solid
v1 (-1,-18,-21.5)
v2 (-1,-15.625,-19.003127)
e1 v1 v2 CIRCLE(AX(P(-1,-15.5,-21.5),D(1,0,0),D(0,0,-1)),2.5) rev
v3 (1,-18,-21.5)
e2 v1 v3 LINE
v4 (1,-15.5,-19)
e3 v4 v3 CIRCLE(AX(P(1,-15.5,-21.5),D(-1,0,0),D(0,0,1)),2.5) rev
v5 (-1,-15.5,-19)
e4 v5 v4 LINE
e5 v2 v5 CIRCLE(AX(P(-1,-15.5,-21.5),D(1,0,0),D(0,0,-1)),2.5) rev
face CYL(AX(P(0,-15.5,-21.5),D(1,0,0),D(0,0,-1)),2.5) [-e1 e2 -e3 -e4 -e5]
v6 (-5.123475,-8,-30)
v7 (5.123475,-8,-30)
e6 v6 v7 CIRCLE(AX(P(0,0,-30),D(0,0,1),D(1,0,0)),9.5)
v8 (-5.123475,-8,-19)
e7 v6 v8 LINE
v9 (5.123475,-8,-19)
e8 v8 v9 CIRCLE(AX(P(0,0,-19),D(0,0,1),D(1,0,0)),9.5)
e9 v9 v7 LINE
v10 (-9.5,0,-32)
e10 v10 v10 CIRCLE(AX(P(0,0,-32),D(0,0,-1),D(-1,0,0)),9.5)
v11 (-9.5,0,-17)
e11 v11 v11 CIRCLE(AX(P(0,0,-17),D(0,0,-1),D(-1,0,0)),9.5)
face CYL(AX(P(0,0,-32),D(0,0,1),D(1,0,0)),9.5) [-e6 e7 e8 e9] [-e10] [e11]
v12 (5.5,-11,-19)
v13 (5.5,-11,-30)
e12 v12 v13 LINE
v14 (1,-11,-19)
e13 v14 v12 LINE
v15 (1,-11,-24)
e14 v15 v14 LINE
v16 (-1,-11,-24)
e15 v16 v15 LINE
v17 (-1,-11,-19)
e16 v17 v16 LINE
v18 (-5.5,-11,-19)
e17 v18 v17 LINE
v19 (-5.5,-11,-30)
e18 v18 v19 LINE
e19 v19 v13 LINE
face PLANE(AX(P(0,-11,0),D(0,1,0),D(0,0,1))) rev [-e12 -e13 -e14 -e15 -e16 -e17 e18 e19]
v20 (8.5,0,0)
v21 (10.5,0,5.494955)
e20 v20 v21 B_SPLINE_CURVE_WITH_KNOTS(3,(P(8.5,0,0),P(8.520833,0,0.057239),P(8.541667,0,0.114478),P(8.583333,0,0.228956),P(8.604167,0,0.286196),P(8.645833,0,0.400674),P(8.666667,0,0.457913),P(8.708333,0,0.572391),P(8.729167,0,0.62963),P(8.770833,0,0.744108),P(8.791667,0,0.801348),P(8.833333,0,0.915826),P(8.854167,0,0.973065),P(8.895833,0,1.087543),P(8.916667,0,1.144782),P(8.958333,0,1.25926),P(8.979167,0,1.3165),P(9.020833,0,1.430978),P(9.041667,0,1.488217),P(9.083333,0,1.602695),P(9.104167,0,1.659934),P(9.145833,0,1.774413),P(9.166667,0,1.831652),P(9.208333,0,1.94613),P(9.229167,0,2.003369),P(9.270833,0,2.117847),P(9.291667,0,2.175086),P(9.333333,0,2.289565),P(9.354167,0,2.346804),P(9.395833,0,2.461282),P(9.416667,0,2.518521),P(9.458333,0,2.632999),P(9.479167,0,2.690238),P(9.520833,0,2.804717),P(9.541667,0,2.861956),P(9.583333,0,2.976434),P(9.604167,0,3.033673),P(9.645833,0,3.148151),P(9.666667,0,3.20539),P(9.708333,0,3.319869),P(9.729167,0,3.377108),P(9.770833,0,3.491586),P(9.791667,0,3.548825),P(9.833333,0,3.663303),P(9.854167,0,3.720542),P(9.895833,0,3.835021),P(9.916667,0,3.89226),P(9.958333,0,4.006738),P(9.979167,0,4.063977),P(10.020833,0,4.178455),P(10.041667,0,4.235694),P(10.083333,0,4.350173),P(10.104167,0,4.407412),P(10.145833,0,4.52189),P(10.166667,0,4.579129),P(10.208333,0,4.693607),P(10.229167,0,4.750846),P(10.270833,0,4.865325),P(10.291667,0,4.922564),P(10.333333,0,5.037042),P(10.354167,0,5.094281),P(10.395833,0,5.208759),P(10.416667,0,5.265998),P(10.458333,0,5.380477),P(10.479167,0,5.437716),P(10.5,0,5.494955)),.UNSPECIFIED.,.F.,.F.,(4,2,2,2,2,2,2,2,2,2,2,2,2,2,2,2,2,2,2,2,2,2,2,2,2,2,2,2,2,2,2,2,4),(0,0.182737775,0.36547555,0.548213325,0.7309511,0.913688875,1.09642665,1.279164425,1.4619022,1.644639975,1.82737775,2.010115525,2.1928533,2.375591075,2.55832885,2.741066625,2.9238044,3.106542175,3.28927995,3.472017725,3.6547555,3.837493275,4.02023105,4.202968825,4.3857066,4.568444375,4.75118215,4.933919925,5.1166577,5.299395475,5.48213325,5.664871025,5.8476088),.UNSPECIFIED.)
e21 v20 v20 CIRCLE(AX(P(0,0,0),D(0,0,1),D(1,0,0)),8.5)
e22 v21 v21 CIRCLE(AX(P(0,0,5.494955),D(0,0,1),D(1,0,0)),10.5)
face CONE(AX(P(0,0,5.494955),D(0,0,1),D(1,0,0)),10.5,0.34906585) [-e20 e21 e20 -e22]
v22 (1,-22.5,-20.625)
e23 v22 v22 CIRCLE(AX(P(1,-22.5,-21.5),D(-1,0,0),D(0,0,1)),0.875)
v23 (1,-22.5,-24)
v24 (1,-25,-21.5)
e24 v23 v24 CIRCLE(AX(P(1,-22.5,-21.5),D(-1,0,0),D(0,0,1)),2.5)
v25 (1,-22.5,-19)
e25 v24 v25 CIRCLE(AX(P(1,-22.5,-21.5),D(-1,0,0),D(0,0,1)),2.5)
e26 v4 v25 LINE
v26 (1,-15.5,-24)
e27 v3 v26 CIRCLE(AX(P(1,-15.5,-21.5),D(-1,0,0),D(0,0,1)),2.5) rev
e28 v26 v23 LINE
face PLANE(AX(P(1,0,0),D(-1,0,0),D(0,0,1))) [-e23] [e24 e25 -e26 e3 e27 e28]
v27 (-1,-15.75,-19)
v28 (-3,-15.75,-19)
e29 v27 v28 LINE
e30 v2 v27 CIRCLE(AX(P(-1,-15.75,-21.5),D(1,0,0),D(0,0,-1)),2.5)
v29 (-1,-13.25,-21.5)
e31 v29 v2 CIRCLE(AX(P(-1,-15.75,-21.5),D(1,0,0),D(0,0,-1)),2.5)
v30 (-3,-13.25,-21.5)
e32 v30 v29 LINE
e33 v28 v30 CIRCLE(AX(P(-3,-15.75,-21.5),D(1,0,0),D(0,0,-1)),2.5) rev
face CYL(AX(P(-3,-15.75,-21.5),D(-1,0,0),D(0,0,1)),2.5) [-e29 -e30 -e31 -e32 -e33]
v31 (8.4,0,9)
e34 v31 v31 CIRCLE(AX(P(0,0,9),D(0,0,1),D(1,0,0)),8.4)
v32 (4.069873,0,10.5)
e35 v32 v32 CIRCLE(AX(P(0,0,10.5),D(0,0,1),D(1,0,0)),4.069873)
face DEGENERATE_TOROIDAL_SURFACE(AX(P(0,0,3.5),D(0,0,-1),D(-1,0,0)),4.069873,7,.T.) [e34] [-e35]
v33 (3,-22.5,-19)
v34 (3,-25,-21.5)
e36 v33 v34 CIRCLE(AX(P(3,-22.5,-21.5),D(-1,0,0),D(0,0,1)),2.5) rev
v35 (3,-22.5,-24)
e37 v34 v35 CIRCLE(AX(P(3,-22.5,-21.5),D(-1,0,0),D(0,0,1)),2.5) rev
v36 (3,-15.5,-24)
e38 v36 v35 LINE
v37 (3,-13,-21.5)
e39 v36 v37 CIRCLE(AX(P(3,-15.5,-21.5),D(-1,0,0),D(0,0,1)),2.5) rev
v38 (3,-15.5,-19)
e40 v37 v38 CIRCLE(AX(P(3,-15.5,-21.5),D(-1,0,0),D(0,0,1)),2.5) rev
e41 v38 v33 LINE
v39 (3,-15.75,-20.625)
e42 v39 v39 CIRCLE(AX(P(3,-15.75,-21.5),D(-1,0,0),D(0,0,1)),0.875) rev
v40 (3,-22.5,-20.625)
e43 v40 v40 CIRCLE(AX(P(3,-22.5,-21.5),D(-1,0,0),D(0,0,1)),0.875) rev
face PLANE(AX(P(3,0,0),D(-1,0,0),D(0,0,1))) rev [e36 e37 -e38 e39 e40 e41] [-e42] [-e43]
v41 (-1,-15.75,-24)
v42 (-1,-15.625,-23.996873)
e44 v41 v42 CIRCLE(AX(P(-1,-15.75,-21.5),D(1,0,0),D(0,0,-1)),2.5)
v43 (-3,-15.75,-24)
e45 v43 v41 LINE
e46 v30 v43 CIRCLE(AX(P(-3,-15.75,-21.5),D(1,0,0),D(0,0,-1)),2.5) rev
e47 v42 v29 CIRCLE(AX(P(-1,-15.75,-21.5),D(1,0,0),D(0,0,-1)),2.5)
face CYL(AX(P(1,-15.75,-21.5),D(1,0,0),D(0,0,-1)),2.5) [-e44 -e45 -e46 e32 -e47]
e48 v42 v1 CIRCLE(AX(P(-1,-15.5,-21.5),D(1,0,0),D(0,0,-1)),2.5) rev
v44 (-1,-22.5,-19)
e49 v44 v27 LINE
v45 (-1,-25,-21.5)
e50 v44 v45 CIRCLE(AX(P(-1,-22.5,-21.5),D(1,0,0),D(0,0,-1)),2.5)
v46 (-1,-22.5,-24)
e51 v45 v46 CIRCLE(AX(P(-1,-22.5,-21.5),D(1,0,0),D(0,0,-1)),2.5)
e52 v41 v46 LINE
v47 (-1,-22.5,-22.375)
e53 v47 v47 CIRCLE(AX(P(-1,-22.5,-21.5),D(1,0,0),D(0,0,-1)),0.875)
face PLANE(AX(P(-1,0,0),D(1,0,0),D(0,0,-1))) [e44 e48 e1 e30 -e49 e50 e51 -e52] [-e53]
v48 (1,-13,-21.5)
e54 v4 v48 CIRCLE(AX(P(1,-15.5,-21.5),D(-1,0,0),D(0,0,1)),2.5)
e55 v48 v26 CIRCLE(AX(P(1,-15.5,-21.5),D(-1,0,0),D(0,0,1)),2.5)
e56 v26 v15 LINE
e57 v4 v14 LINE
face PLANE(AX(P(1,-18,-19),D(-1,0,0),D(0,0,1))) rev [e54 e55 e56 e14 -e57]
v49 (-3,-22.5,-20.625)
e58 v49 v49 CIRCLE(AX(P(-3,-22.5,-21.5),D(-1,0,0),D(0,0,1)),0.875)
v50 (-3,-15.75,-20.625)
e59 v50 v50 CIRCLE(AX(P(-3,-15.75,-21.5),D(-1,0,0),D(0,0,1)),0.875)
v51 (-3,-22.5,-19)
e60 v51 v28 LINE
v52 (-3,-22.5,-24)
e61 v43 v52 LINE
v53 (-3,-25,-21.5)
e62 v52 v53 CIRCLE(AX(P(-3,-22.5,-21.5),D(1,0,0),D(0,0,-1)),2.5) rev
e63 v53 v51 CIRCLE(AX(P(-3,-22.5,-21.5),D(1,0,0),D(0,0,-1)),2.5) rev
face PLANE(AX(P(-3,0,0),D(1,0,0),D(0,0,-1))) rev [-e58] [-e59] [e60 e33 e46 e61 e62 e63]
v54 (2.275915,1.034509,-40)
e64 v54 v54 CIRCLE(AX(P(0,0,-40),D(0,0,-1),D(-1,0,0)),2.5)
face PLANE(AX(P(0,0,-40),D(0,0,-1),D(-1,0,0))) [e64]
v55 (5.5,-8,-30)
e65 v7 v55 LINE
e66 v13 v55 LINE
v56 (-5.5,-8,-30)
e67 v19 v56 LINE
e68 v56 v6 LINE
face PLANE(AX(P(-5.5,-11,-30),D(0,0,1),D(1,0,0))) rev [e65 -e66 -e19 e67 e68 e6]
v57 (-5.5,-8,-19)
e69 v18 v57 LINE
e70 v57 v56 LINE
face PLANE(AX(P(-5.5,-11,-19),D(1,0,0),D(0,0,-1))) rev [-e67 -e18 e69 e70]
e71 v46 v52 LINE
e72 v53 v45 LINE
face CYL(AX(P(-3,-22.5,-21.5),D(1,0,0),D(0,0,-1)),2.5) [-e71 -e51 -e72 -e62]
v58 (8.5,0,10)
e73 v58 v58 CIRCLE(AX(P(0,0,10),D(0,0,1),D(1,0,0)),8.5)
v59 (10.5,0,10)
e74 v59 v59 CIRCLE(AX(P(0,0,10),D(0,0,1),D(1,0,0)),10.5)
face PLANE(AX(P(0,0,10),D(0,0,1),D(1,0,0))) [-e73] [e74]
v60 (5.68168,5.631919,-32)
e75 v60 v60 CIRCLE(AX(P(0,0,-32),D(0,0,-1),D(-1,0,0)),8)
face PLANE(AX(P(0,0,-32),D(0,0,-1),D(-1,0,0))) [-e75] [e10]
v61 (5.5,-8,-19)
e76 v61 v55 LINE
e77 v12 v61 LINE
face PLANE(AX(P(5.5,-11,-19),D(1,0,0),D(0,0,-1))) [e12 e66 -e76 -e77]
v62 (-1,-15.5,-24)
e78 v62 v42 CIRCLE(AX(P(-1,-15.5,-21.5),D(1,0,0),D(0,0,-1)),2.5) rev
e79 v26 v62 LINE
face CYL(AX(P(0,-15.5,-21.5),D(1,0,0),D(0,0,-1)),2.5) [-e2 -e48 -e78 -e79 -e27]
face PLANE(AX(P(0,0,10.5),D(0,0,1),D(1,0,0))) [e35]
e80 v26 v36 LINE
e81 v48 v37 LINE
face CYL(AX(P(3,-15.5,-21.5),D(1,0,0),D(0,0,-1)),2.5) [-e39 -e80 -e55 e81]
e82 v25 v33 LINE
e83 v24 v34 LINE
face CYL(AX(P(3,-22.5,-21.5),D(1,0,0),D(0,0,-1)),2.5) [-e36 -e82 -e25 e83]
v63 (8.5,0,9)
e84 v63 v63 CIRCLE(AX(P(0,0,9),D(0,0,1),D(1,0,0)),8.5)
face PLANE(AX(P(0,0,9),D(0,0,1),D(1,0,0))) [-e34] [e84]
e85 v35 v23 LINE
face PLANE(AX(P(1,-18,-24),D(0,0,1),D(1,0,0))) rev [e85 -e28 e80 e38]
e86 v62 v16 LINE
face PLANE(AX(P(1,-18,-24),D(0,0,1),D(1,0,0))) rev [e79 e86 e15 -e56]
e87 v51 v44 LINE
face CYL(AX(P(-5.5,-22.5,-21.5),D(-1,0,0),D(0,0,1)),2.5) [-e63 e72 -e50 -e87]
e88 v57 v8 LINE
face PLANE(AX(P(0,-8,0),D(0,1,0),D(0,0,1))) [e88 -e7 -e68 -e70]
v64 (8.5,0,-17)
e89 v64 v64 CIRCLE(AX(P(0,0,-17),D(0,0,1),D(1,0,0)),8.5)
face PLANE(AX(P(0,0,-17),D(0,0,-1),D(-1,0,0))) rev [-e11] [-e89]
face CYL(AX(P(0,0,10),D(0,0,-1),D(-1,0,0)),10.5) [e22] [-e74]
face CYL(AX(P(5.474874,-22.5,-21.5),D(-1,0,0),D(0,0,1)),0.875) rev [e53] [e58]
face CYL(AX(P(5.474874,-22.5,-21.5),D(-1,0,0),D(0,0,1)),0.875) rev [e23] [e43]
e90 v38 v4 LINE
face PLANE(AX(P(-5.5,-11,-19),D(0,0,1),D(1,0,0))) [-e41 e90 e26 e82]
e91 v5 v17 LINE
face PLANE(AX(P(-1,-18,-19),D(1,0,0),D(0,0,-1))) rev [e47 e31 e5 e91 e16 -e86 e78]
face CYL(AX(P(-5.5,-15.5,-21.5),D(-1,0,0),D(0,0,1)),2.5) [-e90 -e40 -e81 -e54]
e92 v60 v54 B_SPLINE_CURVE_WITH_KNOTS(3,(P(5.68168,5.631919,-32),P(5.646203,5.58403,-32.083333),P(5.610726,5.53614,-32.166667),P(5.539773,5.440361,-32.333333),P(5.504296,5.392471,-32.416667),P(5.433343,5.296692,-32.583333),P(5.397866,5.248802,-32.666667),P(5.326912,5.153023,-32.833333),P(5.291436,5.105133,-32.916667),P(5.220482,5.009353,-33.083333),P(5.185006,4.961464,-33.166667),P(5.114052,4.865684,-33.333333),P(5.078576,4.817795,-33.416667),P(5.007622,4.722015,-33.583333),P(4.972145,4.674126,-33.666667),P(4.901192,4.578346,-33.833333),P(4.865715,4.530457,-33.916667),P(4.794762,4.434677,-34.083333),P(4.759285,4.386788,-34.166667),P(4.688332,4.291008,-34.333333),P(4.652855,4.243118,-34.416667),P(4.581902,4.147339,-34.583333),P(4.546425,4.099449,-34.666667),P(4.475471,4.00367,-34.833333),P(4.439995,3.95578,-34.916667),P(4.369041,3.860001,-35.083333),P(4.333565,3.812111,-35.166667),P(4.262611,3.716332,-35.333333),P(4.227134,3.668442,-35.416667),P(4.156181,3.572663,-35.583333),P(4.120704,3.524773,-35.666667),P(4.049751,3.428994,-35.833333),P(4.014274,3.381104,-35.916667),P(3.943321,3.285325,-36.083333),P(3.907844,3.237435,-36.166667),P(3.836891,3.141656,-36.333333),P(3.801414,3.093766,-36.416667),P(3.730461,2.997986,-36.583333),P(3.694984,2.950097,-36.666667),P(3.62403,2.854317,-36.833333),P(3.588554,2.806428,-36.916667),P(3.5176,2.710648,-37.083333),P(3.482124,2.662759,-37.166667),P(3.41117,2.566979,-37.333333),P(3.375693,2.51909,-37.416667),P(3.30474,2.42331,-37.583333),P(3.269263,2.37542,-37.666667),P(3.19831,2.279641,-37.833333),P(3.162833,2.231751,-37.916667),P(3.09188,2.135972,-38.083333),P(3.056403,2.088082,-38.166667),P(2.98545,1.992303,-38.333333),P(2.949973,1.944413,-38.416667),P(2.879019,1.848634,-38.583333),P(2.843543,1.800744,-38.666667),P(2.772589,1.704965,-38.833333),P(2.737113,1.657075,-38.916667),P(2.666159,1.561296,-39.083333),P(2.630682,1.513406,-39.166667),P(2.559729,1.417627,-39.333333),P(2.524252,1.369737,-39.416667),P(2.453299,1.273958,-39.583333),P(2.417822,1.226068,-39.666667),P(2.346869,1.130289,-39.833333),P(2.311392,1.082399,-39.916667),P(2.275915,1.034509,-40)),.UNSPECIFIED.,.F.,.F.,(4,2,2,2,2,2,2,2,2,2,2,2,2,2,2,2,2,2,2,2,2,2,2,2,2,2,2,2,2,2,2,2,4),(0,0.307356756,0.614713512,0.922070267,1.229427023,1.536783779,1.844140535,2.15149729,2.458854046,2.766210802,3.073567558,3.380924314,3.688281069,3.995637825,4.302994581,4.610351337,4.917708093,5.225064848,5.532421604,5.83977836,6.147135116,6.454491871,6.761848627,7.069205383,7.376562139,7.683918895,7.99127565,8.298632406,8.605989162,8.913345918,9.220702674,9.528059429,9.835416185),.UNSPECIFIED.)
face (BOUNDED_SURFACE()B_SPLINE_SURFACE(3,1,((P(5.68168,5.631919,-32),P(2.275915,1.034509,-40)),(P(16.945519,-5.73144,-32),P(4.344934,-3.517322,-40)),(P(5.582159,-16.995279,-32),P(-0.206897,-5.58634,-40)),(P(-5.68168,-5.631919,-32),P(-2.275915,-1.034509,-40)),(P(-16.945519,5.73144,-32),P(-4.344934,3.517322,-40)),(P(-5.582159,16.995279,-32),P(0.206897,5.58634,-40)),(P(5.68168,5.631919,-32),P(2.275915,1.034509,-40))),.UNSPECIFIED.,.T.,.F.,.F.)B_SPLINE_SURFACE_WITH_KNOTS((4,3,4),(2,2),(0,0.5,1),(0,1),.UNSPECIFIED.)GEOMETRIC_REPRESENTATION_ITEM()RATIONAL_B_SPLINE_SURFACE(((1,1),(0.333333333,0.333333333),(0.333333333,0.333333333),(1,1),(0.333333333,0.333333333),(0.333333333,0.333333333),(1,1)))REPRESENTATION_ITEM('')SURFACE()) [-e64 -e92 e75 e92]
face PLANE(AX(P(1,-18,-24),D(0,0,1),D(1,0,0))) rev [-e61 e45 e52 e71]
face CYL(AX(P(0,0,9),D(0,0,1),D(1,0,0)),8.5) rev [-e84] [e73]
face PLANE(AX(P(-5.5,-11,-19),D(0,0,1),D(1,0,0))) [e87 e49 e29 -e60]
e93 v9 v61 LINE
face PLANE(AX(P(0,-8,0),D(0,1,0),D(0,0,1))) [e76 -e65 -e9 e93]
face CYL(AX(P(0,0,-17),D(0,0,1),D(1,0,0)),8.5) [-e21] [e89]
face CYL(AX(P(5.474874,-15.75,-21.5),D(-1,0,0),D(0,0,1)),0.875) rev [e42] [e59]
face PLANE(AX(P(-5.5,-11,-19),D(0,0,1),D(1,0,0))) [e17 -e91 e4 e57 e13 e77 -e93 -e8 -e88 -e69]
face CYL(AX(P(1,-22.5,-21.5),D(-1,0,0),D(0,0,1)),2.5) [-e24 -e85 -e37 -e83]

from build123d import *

# Parameters (mm, degrees)
SKETCH1_R            = 8.5
BOSS_EXTRUDE1_DEPTH  = 17
SKETCH2_R            = 10.5
BOSS_EXTRUDE2_DEPTH  = 10
CHAMFER1_SIZE        = 5.494954839
CHAMFER1_SIZE_2      = 2
SKETCH3_R            = 8.5
CUT_EXTRUDE1_DEPTH   = 1
SKETCH4_R            = 9.5
BOSS_EXTRUDE3_DEPTH  = 15
SKETCH9_W            = 11
SKETCH9_H            = 11
BOSS_EXTRUDE4_DEPTH  = 3
SKETCH10_W           = 2
SKETCH10_H           = 5
BOSS_EXTRUDE5_DEPTH  = 7
FILLET1_R            = 2.5
SKETCH13_R           = 8.4
BOSS_EXTRUDE7_DEPTH  = 1.5
FILLET3_R            = 7
SKETCH14_W           = 5
SKETCH14_H           = 12
BOSS_EXTRUDE9_DEPTH  = 2
SKETCH15_W           = 5
SKETCH15_H           = 11.75
BOSS_EXTRUDE10_DEPTH = 2
FILLET4_START        = -5.5
FILLET4_DEPTH        = 4.5
FILLET4_START_2      = 1
FILLET4_2_DEPTH      = 4.5
CUT_EXTRUDE3_REACH   = 51.064
SKETCH16_R           = 0.875


with BuildPart() as part:
    # Sketch1 → Boss-Extrude1 (new body)
    with BuildSketch(Plane.XY):
        Circle(SKETCH1_R)
    extrude(amount=-BOSS_EXTRUDE1_DEPTH)

    # Sketch2 → Boss-Extrude2 (add)
    with BuildSketch(Plane.XY):
        Circle(SKETCH2_R)
    extrude(amount=BOSS_EXTRUDE2_DEPTH)

    # Chamfer1
    # the kernel refuses this chamfer: 5.494954839, 2 mm, written as the material it takes off along each edge
    with BuildSketch(Plane(origin=(0, 0, 0), x_dir=(1, 0, 0), z_dir=(0, -1, 0))) as chamfer1_piece_1_section:
        Polygon((10.5, CHAMFER1_SIZE), (10.5 - CHAMFER1_SIZE_2, 0), (10.5, 0), align=None)
    chamfer1_piece_1 = revolve(axis=Axis((0, 0, 0), (0, 0, 1)), mode=Mode.PRIVATE)
    chamfer1_piece_1 = chamfer1_piece_1 - Plane(origin=(0, 0, 0), x_dir=(1, 0, 0), z_dir=(0, 0, 1)) * Cylinder(8.5, 42, mode=Mode.PRIVATE)
    add(chamfer1_piece_1, mode=Mode.SUBTRACT)

    # Sketch3 → Cut-Extrude1 (cut)
    with BuildSketch(Plane.XY.offset(10)):
        Circle(SKETCH3_R)
    extrude(amount=-CUT_EXTRUDE1_DEPTH, mode=Mode.SUBTRACT)

    # Sketch4 → Boss-Extrude3 (add)
    with BuildSketch(Plane(origin=(0, 0, -17), x_dir=(-1, 0, 0), z_dir=(0, 0, -1))):
        Circle(SKETCH4_R)
    extrude(amount=BOSS_EXTRUDE3_DEPTH)

    # Loft2: read off the stored shape, not the designer's step
    # Loft2: loft between two sections, ruled curve by curve
    loft2_from = [
        Edge.make_bspline([(5.6816796, 5.631919471, -32), (16.945518542, -5.731439728, -32), (5.582159343, -16.99527867, -32), (-5.6816796, -5.631919471, -32), (-16.945518542, 5.731439728, -32), (-5.582159343, 16.99527867, -32), (5.6816796, 5.631919471, -32)], [0, 0, 0, 0, 0.5, 0.5, 0.5, 1, 1, 1, 1], 3, [1, 0.333333333, 0.333333333, 1, 0.333333333, 0.333333333, 1]),
    ]
    loft2_to = [
        Edge.make_bspline([(2.275915377, 1.034509157, -40), (4.344933691, -3.517321597, -40), (-0.206897063, -5.586339911, -40), (-2.275915377, -1.034509157, -40), (-4.344933691, 3.517321597, -40), (0.206897063, 5.586339911, -40), (2.275915377, 1.034509157, -40)], [0, 0, 0, 0, 0.5, 0.5, 0.5, 1, 1, 1, 1], 3, [1, 0.333333333, 0.333333333, 1, 0.333333333, 0.333333333, 1]),
    ]
    loft2 = Solid(Shell([*[Face.make_surface_from_curves(loft2_from[k], loft2_to[k]) for k in range(1)], Face(Wire(loft2_from)), Face(Wire(loft2_to))]))
    add(loft2)

    # Sketch9 → Boss-Extrude4 (add)
    with BuildSketch(Plane(origin=(0, -8, 0), x_dir=(1, 0, 0), z_dir=(0, 1, 0))):
        with Locations((0, 24.5)):
            Rectangle(SKETCH9_W, SKETCH9_H)
    extrude(amount=-BOSS_EXTRUDE4_DEPTH)

    # Sketch10 → Boss-Extrude5 (add)
    with BuildSketch(Plane.XZ.offset(11)):
        with Locations((0, -21.5)):
            Rectangle(SKETCH10_W, SKETCH10_H)
    extrude(amount=BOSS_EXTRUDE5_DEPTH)

    # Fillet1
    fillet1_edges = [part.edges().sort_by_distance(p)[0] for p in [
        (0, -18, -19),
        (0, -18, -24),
    ]]
    fillet(fillet1_edges, radius=FILLET1_R - 0.0001)  # a hair under: the kernel refuses the full size

    # Sketch13 → Boss-Extrude7 (add)
    with BuildSketch(Plane.XY.offset(9)):
        Circle(SKETCH13_R)
    extrude(amount=BOSS_EXTRUDE7_DEPTH)

    # Fillet3
    # the kernel refuses this fillet: 7 mm, written as the material it takes off along each edge
    with BuildSketch(Plane(origin=(0, 0, 10.5), x_dir=(1, 0, 0), z_dir=(0, -1, 0))) as fillet3_piece_1:
        with BuildLine():
            CenterArc((4.069872981, -7), FILLET3_R, 51.786789298, 38.213210702)
            Line((4.069872981, 0), (8.4, 0))
            Line((8.4, 0), (8.4, -1.5))
        make_face()
    revolve(axis=Axis((0, 0, 10.5), (0, 0, 1)), mode=Mode.SUBTRACT)

    # Sketch14 → Boss-Extrude9 (add)
    with BuildSketch(Plane(origin=(1, 0, 0), x_dir=(0, 0, -1), z_dir=(1, 0, 0))):
        with Locations((21.5, -19)):
            Rectangle(SKETCH14_W, SKETCH14_H)
    extrude(amount=BOSS_EXTRUDE9_DEPTH)

    # Sketch15 → Boss-Extrude10 (add)
    with BuildSketch(Plane.ZY.offset(1)):
        with Locations((-21.5, -19.125)):
            Rectangle(SKETCH15_W, SKETCH15_H)
    extrude(amount=BOSS_EXTRUDE10_DEPTH)

    # Fillet4: read off the stored shape, not the designer's step
    # Fillet4 outline → Fillet4 (cut)
    with BuildSketch(Plane.YZ.offset(FILLET4_START)):
        with BuildLine():
            Line((-25, -19), (-25, -21.5))
            ThreePointArc((-25, -21.5), (-24.267766953, -19.732233047), (-22.5, -19))
            Line((-22.5, -19), (-25, -19))
        make_face()
        with BuildLine():
            ThreePointArc((-22.5, -24), (-24.267766953, -23.267766953), (-25, -21.5))
            Line((-25, -21.5), (-25, -24))
            Line((-25, -24), (-22.5, -24))
        make_face()
        with BuildLine():
            ThreePointArc((-13.25, -21.5), (-13.982233047, -23.267766953), (-15.75, -24))
            Line((-15.75, -24), (-13.25, -24))
            Line((-13.25, -24), (-13.25, -21.5))
        make_face()
        with BuildLine():
            ThreePointArc((-15.75, -19), (-13.982233047, -19.732233047), (-13.25, -21.5))
            Line((-13.25, -21.5), (-13.25, -19))
            Line((-13.25, -19), (-15.75, -19))
        make_face()
    extrude(amount=FILLET4_DEPTH, mode=Mode.SUBTRACT)

    # Fillet4 2 outline → Fillet4 2 (cut)
    with BuildSketch(Plane.YZ.offset(FILLET4_START_2)):
        with BuildLine():
            Line((-25, -19), (-25, -21.5))
            ThreePointArc((-25, -21.5), (-24.267766953, -19.732233047), (-22.5, -19))
            Line((-22.5, -19), (-25, -19))
        make_face()
        with BuildLine():
            ThreePointArc((-22.5, -24), (-24.267766953, -23.267766953), (-25, -21.5))
            Line((-25, -21.5), (-25, -24))
            Line((-25, -24), (-22.5, -24))
        make_face()
        with BuildLine():
            Line((-15.5, -24), (-13, -24))
            Line((-13, -24), (-13, -21.5))
            ThreePointArc((-13, -21.5), (-13.732233047, -23.267766953), (-15.5, -24))
        make_face()
        with BuildLine():
            ThreePointArc((-15.5, -19), (-13.732233047, -19.732233047), (-13, -21.5))
            Line((-13, -21.5), (-13, -19))
            Line((-13, -19), (-15.5, -19))
        make_face()
    extrude(amount=FILLET4_2_DEPTH, mode=Mode.SUBTRACT)

    # Cut-Extrude3: up to this face of the body (flat: up to its plane)
    cut_extrude3_end = Plane(part.part.faces().sort_by_distance((3, -19, -21.5))[0])
    # Sketch16 → Cut-Extrude3 (cut, up to the picked face)
    with BuildSketch(Plane.ZY.offset(3), mode=Mode.PRIVATE) as cut_extrude3_sk1:
        with Locations((-21.5, -15.75)):
            Circle(SKETCH16_R)
    cut_extrude3_tool1 = split(extrude(cut_extrude3_sk1.sketch, amount=-CUT_EXTRUDE3_REACH, mode=Mode.PRIVATE), bisect_by=cut_extrude3_end, keep=Keep.BOTH, mode=Mode.PRIVATE)
    # Sketch16 → Cut-Extrude3 (cut, up to the picked face)
    with BuildSketch(Plane.ZY.offset(3), mode=Mode.PRIVATE) as cut_extrude3_sk2:
        with Locations((-21.5, -22.5)):
            Circle(SKETCH16_R)
    cut_extrude3_tool2 = split(extrude(cut_extrude3_sk2.sketch, amount=-CUT_EXTRUDE3_REACH, mode=Mode.PRIVATE), bisect_by=cut_extrude3_end, keep=Keep.BOTH, mode=Mode.PRIVATE)
    add(cut_extrude3_tool1.solids().sort_by(Axis((-3, -15.75, -21.5), (1, 0, 0)))[0], mode=Mode.SUBTRACT)
    add(cut_extrude3_tool2.solids().sort_by(Axis((-3, -22.5, -21.5), (1, 0, 0)))[0], mode=Mode.SUBTRACT)


solid = part.part
